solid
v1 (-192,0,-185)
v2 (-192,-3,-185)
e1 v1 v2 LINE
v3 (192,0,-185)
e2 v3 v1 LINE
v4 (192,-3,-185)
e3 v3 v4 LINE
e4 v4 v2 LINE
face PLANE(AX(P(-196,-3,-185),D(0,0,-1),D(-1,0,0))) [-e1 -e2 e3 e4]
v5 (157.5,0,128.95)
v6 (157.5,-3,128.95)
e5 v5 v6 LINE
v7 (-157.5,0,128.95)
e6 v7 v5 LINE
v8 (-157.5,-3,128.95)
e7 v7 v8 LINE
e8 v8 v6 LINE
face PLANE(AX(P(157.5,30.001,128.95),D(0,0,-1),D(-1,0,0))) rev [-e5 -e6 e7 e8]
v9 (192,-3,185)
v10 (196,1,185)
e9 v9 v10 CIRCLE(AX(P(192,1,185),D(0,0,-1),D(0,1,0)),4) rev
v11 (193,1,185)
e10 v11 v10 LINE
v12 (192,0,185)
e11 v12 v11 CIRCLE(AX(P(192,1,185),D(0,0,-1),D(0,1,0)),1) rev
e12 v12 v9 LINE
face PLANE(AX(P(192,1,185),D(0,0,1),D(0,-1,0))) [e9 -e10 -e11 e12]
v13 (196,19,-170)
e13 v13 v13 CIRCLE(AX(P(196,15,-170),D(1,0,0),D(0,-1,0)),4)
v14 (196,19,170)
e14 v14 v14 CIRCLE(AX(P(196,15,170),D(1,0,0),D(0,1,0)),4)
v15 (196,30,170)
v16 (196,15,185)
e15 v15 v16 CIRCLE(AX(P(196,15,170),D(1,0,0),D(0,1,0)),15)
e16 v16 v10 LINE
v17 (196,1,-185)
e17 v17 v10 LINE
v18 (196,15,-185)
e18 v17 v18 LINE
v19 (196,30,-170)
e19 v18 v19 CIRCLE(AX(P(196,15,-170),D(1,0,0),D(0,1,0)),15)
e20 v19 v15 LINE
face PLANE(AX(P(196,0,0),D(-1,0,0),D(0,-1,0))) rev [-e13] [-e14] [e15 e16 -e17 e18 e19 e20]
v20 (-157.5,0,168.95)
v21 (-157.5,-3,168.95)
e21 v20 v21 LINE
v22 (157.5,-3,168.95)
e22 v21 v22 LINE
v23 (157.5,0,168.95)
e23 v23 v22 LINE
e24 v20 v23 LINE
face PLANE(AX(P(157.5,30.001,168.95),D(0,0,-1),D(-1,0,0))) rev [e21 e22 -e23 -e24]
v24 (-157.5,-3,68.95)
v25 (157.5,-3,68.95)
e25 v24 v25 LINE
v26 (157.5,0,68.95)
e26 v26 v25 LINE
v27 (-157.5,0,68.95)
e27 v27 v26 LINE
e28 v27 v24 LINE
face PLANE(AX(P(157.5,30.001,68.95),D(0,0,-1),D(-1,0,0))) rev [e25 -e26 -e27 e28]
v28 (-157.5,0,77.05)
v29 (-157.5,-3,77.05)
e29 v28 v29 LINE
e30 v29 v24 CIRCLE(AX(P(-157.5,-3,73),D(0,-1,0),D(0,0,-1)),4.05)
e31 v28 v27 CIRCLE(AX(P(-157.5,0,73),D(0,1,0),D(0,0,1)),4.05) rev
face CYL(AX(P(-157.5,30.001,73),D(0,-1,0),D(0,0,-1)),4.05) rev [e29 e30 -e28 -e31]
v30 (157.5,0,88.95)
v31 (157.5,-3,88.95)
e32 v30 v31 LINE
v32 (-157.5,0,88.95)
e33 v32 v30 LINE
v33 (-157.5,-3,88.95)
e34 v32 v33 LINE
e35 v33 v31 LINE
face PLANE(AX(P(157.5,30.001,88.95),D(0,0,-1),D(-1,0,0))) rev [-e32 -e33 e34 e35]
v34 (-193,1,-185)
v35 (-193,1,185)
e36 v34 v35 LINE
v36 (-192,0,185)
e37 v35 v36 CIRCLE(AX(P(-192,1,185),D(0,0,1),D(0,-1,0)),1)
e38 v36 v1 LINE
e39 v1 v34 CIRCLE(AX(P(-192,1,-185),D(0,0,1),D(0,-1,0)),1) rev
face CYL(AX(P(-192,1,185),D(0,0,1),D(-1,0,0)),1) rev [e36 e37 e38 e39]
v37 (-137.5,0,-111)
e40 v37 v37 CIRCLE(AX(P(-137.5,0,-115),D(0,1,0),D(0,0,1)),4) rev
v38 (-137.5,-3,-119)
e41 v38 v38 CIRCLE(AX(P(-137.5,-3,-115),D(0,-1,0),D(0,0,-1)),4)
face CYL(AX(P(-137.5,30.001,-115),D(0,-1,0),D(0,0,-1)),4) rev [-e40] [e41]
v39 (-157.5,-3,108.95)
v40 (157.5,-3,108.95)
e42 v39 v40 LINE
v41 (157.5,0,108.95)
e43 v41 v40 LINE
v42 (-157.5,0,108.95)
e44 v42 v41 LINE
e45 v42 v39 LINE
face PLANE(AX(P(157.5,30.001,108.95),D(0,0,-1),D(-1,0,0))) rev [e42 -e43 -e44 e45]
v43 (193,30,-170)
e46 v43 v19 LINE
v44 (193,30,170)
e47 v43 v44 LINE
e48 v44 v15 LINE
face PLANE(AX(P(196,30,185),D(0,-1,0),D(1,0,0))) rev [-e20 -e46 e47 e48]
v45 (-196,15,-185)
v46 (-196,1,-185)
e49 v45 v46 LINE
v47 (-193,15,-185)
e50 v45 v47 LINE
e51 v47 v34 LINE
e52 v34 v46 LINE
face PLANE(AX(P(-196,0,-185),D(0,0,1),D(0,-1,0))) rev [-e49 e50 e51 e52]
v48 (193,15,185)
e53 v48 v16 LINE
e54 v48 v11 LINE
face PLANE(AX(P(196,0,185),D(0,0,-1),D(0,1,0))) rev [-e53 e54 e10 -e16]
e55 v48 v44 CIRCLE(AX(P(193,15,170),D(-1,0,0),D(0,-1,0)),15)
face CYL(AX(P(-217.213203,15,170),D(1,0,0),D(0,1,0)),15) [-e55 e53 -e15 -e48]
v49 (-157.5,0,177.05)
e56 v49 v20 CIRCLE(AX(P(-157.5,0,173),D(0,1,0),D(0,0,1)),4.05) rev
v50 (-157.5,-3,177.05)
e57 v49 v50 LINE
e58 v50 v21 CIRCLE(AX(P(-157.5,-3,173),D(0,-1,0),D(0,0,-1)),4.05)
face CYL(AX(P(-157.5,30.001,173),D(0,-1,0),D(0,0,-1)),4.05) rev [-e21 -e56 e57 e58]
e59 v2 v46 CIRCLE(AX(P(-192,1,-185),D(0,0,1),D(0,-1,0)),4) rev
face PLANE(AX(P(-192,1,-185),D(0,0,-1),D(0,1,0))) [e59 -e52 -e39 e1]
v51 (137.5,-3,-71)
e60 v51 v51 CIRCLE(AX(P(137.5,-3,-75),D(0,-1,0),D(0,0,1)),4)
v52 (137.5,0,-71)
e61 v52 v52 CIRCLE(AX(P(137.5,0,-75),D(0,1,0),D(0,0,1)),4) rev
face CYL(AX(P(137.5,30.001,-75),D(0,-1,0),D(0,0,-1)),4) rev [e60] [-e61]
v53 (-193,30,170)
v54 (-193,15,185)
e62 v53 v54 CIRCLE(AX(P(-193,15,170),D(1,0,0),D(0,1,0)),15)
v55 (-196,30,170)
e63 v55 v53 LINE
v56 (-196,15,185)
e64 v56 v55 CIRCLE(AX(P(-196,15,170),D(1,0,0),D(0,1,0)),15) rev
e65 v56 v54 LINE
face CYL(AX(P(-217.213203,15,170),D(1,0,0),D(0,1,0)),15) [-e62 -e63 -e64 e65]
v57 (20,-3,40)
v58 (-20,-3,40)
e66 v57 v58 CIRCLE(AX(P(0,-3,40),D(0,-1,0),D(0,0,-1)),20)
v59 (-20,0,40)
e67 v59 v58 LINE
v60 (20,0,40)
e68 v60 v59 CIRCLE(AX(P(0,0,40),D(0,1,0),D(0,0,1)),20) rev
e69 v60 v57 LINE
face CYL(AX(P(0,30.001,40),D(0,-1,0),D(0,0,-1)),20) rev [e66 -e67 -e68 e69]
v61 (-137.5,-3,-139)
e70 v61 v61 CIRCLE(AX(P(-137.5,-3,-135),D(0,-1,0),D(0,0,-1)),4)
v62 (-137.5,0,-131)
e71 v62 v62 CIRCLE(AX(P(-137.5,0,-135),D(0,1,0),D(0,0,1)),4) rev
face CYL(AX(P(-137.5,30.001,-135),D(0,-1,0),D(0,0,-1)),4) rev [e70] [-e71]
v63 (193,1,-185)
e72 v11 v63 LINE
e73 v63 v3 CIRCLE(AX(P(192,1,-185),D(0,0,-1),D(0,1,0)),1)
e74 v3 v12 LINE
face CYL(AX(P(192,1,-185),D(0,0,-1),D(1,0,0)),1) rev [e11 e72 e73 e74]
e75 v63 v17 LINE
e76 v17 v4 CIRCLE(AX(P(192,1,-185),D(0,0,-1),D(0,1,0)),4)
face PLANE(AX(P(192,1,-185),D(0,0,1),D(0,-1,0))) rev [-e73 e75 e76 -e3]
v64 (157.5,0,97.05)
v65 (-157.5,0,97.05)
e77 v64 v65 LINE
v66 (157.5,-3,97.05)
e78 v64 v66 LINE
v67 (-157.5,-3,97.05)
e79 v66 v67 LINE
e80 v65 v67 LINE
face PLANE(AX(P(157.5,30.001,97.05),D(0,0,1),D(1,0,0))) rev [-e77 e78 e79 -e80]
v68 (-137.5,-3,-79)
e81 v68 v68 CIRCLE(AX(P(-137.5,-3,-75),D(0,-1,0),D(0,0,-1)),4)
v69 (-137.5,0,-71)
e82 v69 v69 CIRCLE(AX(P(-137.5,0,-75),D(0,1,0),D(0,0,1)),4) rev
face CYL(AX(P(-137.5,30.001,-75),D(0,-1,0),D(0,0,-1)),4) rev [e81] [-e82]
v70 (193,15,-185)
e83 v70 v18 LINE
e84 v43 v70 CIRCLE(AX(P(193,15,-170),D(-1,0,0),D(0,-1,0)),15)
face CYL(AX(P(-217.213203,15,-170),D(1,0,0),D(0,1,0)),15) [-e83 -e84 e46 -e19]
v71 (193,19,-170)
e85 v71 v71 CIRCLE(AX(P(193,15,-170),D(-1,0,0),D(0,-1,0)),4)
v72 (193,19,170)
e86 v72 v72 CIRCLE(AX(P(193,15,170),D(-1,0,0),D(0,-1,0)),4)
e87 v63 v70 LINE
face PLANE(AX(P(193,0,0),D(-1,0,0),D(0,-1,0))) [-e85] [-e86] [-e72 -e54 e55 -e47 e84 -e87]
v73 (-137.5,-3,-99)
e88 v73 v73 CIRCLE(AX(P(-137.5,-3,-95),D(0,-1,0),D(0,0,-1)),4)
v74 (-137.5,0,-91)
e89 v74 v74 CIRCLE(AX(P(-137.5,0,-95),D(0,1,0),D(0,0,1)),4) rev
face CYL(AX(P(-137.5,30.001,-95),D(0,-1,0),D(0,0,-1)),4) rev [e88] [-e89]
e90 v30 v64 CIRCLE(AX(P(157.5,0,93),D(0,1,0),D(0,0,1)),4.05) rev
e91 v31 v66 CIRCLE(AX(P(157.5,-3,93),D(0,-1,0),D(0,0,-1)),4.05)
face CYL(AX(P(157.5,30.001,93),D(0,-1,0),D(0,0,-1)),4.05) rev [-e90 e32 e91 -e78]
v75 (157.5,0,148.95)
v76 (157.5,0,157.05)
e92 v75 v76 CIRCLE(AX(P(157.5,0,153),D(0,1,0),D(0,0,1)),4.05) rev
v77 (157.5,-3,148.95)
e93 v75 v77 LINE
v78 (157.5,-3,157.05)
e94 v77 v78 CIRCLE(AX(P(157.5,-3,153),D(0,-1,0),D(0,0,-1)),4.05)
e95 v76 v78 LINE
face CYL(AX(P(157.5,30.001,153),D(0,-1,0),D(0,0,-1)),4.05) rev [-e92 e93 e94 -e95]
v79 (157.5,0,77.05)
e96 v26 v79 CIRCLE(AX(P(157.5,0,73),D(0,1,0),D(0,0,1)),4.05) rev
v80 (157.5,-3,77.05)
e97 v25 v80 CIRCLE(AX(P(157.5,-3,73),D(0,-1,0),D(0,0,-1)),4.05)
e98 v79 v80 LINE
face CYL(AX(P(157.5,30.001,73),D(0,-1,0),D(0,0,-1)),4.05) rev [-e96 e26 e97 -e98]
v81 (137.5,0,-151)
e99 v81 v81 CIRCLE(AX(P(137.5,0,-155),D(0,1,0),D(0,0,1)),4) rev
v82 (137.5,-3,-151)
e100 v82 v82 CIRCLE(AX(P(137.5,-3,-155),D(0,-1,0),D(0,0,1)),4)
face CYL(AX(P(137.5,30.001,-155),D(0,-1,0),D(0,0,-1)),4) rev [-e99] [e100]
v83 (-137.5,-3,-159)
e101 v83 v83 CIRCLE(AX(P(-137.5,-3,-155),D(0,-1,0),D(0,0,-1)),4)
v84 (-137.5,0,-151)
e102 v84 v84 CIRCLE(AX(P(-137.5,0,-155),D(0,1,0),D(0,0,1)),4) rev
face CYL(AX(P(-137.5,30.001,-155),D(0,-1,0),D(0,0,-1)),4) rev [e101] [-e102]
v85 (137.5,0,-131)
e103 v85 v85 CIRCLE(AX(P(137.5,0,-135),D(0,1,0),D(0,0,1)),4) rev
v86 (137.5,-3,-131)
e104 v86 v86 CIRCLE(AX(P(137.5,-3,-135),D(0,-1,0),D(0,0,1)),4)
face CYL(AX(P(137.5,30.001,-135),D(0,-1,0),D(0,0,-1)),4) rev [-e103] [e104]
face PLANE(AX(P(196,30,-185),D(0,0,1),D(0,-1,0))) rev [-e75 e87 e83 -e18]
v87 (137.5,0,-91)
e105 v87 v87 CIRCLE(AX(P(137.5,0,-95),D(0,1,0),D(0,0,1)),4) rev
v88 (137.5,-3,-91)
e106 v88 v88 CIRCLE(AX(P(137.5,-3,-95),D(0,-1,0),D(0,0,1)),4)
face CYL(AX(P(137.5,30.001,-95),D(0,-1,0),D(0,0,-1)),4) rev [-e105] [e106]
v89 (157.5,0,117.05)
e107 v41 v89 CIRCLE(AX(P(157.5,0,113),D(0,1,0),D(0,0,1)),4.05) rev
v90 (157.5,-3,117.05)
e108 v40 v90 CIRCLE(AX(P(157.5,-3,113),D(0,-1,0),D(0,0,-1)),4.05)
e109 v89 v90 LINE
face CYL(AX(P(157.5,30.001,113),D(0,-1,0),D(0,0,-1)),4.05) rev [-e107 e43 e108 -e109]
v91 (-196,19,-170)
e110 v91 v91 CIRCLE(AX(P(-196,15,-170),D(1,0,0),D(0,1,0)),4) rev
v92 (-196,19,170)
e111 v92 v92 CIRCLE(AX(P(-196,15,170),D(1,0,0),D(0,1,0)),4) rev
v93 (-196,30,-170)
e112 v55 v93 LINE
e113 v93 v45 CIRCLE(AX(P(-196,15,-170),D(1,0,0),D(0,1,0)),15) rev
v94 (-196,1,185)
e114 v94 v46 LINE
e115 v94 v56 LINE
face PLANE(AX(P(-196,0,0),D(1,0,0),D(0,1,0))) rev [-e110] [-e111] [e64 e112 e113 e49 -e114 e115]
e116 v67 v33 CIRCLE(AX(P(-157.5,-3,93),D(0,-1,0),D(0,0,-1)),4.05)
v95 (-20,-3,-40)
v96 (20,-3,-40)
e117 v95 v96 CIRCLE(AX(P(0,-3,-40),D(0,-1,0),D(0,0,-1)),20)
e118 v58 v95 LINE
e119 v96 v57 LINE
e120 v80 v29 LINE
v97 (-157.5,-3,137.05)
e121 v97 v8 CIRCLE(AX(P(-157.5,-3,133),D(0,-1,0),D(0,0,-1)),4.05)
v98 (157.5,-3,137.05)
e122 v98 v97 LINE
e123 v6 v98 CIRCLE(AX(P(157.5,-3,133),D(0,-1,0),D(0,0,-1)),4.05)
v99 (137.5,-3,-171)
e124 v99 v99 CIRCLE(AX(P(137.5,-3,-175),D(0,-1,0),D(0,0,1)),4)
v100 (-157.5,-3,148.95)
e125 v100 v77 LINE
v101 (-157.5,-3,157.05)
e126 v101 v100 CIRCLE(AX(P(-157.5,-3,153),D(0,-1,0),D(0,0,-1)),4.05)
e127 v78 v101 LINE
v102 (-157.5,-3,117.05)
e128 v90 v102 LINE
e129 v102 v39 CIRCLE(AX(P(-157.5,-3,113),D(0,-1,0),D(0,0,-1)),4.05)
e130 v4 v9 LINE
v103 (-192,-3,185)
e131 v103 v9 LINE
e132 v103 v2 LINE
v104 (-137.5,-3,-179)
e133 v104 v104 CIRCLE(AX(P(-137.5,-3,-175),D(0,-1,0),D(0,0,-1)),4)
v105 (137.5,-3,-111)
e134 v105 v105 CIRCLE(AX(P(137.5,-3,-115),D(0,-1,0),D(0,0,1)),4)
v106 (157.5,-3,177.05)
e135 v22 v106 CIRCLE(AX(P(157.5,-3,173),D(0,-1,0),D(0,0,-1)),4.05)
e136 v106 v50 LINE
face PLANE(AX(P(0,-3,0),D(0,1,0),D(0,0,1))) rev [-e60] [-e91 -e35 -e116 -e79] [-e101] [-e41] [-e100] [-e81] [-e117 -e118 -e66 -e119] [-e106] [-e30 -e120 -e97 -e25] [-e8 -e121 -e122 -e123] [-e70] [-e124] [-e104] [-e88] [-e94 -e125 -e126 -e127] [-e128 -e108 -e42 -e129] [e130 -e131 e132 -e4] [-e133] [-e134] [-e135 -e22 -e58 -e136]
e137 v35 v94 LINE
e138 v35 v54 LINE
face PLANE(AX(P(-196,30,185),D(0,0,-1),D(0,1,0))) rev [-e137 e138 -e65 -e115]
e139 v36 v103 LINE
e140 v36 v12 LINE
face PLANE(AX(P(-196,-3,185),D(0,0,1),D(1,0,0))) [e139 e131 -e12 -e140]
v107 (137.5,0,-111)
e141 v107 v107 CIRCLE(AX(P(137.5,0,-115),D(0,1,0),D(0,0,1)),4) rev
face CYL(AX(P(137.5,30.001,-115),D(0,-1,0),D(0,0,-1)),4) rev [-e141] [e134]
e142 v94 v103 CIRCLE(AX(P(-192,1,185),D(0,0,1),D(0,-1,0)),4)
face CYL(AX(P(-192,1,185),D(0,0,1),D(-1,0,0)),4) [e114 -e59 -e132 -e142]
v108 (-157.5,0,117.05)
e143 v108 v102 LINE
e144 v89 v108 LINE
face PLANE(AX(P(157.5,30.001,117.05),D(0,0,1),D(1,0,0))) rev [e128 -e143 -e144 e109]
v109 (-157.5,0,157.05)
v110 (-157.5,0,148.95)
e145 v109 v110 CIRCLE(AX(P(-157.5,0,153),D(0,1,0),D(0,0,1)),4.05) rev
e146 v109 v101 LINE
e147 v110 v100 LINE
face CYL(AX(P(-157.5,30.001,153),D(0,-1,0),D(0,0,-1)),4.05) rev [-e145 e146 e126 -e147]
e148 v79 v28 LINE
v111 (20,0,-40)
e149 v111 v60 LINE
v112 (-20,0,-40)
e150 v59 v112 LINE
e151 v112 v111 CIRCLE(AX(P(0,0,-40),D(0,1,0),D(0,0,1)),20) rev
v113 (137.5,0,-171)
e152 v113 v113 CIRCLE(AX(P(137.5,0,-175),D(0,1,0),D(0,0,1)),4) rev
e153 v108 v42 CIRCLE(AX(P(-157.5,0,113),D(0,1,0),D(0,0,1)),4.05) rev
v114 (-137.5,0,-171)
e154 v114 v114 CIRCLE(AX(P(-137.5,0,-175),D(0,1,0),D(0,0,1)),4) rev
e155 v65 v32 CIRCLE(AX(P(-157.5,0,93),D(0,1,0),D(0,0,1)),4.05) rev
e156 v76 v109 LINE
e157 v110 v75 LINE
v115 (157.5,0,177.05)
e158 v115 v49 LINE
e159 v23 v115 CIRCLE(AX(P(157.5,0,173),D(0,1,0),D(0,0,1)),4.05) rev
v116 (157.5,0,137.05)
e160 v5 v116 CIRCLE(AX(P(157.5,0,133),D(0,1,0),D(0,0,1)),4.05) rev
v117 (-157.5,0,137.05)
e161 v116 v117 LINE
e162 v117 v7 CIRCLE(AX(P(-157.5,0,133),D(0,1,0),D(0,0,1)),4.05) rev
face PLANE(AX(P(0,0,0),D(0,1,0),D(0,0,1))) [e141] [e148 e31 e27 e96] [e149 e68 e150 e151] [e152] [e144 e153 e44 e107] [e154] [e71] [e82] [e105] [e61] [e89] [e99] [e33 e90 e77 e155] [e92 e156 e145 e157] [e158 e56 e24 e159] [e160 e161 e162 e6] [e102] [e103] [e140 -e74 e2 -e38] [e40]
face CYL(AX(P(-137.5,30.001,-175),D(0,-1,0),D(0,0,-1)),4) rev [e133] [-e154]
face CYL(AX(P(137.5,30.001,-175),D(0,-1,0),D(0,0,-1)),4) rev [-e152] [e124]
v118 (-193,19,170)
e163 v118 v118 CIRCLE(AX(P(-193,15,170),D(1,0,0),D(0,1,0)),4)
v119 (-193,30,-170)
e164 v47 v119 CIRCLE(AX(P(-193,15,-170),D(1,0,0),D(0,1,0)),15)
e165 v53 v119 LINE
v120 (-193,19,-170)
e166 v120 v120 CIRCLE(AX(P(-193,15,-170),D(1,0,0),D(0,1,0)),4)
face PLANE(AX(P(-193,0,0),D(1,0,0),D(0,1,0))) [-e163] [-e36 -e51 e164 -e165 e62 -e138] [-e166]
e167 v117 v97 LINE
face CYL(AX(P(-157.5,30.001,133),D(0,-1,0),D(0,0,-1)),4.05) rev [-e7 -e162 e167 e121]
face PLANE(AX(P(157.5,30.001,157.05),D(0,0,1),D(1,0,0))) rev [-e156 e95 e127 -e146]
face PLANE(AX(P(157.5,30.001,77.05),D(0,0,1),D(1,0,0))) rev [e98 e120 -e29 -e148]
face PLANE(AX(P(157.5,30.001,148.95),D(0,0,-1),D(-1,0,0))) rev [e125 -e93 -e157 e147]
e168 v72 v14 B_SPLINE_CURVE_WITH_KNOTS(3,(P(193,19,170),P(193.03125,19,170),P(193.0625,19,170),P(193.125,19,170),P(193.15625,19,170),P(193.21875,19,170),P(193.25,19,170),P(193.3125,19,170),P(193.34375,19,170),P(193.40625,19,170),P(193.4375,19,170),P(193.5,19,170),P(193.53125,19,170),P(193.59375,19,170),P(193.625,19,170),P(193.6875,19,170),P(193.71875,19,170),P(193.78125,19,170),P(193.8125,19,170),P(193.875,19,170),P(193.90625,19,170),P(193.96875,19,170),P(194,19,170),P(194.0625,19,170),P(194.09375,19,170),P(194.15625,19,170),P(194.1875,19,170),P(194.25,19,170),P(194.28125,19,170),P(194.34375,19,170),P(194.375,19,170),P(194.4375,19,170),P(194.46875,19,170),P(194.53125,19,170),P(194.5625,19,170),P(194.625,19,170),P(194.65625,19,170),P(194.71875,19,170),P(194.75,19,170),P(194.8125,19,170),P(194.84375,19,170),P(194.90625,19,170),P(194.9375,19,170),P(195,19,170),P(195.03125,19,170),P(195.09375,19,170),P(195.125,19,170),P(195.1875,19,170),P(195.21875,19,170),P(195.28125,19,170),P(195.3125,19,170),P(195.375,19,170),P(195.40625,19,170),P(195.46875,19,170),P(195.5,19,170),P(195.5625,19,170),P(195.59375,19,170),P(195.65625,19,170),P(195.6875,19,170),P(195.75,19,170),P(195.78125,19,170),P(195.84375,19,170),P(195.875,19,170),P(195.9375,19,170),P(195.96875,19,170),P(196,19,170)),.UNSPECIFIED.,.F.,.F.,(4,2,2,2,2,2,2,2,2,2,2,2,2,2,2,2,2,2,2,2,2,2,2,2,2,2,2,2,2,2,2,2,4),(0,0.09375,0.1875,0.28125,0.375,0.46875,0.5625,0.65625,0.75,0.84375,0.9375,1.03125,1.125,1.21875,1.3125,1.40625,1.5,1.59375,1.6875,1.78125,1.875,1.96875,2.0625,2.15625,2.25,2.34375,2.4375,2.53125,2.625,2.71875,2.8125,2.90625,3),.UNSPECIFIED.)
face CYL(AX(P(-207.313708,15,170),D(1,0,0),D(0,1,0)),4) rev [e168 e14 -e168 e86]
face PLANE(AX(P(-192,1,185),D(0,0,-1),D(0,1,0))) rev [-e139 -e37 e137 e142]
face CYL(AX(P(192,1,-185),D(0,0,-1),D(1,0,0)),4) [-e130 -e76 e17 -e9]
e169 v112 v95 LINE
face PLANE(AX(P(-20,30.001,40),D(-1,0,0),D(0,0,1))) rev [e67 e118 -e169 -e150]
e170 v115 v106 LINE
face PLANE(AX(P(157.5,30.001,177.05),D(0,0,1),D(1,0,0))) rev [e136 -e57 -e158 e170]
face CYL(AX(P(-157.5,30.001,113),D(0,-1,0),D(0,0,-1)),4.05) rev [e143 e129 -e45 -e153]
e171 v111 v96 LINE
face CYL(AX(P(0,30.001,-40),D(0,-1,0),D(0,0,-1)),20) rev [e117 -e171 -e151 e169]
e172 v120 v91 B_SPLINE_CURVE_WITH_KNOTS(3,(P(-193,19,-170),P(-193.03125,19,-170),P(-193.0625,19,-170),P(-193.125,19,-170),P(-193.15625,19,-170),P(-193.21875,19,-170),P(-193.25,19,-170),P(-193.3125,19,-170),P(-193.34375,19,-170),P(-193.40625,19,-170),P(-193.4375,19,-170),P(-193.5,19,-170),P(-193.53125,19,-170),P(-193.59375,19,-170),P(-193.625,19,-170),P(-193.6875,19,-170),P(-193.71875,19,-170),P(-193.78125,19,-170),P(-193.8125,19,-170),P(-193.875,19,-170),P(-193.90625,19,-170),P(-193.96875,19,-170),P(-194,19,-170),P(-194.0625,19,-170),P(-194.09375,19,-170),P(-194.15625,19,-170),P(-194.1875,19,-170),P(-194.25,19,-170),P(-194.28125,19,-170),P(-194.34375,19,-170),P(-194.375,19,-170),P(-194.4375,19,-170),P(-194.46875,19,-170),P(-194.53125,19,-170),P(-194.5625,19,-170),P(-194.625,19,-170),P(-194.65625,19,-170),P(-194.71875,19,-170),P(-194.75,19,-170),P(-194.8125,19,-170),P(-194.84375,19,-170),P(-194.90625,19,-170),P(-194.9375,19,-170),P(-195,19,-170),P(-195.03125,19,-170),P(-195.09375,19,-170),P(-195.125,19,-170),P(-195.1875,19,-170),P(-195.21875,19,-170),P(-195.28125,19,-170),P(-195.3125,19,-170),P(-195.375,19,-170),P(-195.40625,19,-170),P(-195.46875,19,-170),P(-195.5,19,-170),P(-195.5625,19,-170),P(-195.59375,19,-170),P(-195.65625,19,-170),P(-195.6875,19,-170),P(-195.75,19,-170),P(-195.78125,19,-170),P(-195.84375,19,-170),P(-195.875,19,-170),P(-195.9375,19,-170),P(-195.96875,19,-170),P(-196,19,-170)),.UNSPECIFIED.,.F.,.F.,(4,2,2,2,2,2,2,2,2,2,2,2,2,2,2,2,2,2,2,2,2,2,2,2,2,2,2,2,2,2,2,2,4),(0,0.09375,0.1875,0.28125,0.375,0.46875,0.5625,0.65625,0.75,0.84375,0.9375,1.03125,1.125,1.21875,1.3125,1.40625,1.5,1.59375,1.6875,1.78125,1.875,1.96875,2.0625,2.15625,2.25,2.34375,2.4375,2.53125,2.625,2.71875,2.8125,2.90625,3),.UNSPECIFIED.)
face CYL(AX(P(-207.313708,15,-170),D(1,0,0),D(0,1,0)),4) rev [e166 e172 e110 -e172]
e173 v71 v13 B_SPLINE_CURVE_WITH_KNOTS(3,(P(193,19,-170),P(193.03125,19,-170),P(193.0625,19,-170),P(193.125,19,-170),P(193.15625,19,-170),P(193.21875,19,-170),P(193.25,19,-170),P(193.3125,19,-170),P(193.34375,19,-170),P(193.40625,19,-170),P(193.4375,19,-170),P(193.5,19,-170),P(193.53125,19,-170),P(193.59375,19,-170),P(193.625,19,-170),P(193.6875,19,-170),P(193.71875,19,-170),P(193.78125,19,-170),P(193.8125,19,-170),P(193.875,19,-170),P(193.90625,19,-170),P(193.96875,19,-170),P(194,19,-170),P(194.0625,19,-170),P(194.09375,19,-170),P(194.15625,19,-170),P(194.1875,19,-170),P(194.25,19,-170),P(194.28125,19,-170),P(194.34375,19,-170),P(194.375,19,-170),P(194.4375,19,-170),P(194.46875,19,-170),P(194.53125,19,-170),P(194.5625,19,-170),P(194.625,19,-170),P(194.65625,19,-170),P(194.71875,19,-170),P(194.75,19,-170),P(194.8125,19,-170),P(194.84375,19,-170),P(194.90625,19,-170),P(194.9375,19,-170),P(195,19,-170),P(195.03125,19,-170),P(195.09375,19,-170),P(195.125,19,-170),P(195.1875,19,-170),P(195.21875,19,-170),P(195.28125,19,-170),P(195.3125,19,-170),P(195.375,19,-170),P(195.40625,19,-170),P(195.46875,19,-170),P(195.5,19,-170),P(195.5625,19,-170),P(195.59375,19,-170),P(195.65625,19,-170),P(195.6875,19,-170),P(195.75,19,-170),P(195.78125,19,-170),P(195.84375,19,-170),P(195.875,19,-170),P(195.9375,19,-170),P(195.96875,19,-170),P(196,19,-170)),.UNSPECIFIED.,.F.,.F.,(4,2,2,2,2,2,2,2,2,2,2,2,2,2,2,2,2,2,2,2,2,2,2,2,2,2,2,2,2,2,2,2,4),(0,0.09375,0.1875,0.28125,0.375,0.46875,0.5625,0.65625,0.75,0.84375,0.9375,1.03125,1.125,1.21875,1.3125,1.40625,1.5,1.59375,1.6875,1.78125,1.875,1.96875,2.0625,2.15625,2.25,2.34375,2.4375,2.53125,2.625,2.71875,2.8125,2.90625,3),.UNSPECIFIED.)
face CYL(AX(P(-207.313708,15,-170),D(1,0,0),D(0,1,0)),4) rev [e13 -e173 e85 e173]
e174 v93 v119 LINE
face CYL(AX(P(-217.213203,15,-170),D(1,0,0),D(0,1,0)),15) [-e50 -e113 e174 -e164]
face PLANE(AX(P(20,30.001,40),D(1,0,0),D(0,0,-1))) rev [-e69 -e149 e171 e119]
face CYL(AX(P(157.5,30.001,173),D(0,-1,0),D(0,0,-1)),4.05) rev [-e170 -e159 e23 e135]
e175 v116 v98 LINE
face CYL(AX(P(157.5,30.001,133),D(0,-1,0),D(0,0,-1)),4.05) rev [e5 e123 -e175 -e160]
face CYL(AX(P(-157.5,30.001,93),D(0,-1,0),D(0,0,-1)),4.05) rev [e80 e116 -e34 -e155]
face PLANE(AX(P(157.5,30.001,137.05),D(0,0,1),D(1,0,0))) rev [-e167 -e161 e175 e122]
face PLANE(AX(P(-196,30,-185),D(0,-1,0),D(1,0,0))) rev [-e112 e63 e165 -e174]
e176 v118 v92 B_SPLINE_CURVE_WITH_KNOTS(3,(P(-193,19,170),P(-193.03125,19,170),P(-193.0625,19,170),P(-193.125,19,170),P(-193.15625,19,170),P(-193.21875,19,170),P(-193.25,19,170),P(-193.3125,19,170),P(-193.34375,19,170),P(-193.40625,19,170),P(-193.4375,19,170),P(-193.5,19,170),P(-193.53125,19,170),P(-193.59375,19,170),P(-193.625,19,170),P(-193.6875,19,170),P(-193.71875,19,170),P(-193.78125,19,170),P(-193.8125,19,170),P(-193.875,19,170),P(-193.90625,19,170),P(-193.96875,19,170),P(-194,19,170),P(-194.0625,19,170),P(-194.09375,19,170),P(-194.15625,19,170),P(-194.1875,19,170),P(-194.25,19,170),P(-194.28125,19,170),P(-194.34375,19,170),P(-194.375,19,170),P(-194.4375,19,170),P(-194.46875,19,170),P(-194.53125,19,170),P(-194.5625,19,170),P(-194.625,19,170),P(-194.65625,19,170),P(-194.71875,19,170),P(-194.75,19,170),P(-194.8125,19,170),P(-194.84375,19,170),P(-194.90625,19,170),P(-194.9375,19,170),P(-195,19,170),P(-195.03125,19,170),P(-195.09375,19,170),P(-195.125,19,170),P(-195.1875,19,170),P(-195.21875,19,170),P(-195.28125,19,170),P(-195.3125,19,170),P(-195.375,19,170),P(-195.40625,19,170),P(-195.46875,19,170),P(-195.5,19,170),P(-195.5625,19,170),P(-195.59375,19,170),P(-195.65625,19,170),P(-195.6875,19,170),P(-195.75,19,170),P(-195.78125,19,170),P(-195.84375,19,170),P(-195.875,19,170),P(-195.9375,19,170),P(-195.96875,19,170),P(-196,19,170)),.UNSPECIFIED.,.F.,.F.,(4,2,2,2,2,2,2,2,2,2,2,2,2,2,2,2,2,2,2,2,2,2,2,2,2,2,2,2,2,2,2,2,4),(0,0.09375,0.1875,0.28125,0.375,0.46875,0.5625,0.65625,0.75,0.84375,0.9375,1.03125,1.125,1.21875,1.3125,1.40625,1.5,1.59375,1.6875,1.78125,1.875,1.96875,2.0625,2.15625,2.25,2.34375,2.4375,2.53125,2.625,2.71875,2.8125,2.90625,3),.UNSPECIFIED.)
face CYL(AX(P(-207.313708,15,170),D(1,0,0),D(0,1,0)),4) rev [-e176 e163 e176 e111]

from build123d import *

# Parameters (mm, degrees)
SKETCH1_W                      = 392
SKETCH1_H                      = 370
BASE_FLANGE1_DEPTH             = 3
EDGE_FLANGE1_STRIP_W           = 14
EDGE_FLANGE1_STRIP_H           = 3
EDGE_FLANGE1_STRIP_CUT_DEPTH   = 370
EDGE_FLANGE1_STRIP_2_W         = 14
EDGE_FLANGE1_STRIP_2_H         = 3
EDGE_FLANGE1_STRIP_CUT_2_DEPTH = 370
EDGE_FLANGE1_DEPTH             = 370
EDGE_FLANGE1_BEND_DEPTH        = 370
CUT_EXTRUDE1_REACH             = 436.499
SKETCH11_R                     = 4
CUT_EXTRUDE2_REACH             = 273.533
SKETCH12_R                     = 4
CUT_EXTRUDE3_REACH             = 436.499


# Sheet-metal steps are written as plain solids
with BuildPart() as part:
    # Sketch1 → Base-Flange1 (new body)
    with BuildSketch(Plane(origin=(0, 0, 0), x_dir=(1, 0, 0), z_dir=(0, 1, 0))):
        Rectangle(SKETCH1_W, SKETCH1_H)
    extrude(amount=-BASE_FLANGE1_DEPTH)

    # Edge-Flange1 strip (across the edge) → Edge-Flange1 strip cut (cut)
    with BuildSketch(Plane(origin=(-196, 0, -185), x_dir=(1, 0, 0), z_dir=(0, 0, 1))):
        with Locations((-3, -1.5)):
            Rectangle(EDGE_FLANGE1_STRIP_W, EDGE_FLANGE1_STRIP_H)
    extrude(amount=EDGE_FLANGE1_STRIP_CUT_DEPTH, mode=Mode.SUBTRACT)

    # Edge-Flange1 strip 2 (across the edge) → Edge-Flange1 strip cut 2 (cut)
    with BuildSketch(Plane(origin=(196, 0, 185), x_dir=(-1, 0, 0), z_dir=(0, 0, -1))):
        with Locations((-3, -1.5)):
            Rectangle(EDGE_FLANGE1_STRIP_2_W, EDGE_FLANGE1_STRIP_2_H)
    extrude(amount=EDGE_FLANGE1_STRIP_CUT_2_DEPTH, mode=Mode.SUBTRACT)

    # Edge-Flange1 section (across the edge) → Edge-Flange1 (add)
    with BuildSketch(Plane(origin=(-196, 0, -185), x_dir=(1, 0, 0), z_dir=(0, 0, 1))):
        with BuildLine():
            Line((0, 1), (0, 30))
            Line((0, 30), (3, 30))
            Line((3, 30), (3, 1))
            ThreePointArc((3, 1), (3.292893219, 0.292893219), (4, 0))
            Line((4, 0), (4, -3))
            ThreePointArc((4, -3), (1.171572875, -1.828427125), (0, 1))
        make_face()
    extrude(amount=EDGE_FLANGE1_DEPTH)

    # Edge-Flange1 section 2 (across the edge) → Edge-Flange1 bend (add)
    with BuildSketch(Plane(origin=(196, 0, 185), x_dir=(-1, 0, 0), z_dir=(0, 0, -1))):
        with BuildLine():
            Line((0, 1), (0, 30))
            Line((0, 30), (3, 30))
            Line((3, 30), (3, 1))
            ThreePointArc((3, 1), (3.292893219, 0.292893219), (4, 0))
            Line((4, 0), (4, -3))
            ThreePointArc((4, -3), (1.171572875, -1.828427125), (0, 1))
        make_face()
    extrude(amount=EDGE_FLANGE1_BEND_DEPTH)

    # Cut-Extrude1: up to this face of the body (flat: up to its plane)
    cut_extrude1_end = Plane(part.part.faces().sort_by_distance((-196, 15.5, 0))[0])
    # Sketch11 → Cut-Extrude1 (cut, up to the picked face)
    with BuildSketch(Plane(origin=(196, 0, 0), x_dir=(0, 0, -1), z_dir=(1, 0, 0)), mode=Mode.PRIVATE) as cut_extrude1_sk1:
        with Locations(Location((-170, 15, 0), (0, 0, 90))):
            Circle(SKETCH11_R)
    cut_extrude1_tool1 = split(extrude(cut_extrude1_sk1.sketch, amount=-CUT_EXTRUDE1_REACH, mode=Mode.PRIVATE), bisect_by=cut_extrude1_end, keep=Keep.BOTH, mode=Mode.PRIVATE)
    # Sketch11 → Cut-Extrude1 (cut, up to the picked face)
    with BuildSketch(Plane(origin=(196, 0, 0), x_dir=(0, 0, -1), z_dir=(1, 0, 0)), mode=Mode.PRIVATE) as cut_extrude1_sk2:
        with Locations(Location((170, 15, 0), (0, 0, 90))):
            Circle(SKETCH11_R)
    cut_extrude1_tool2 = split(extrude(cut_extrude1_sk2.sketch, amount=-CUT_EXTRUDE1_REACH, mode=Mode.PRIVATE), bisect_by=cut_extrude1_end, keep=Keep.BOTH, mode=Mode.PRIVATE)
    add(cut_extrude1_tool1.solids().sort_by(Axis((196, 15, 170), (-1, 0, 0)))[0], mode=Mode.SUBTRACT)
    add(cut_extrude1_tool2.solids().sort_by(Axis((196, 15, -170), (-1, 0, 0)))[0], mode=Mode.SUBTRACT)

    # Sketch12 → Cut-Extrude2 (cut, up to next)
    with BuildSketch(Plane.XZ.offset(3), mode=Mode.PRIVATE) as cut_extrude2_sk1:
        with Locations(Location((-137.5, -135, 0), (0, 0, 270))):
            Circle(SKETCH12_R)
    cut_extrude2_tool1 = extrude(cut_extrude2_sk1.sketch, amount=-CUT_EXTRUDE2_REACH, mode=Mode.PRIVATE) & part.part
    # Sketch12 → Cut-Extrude2 (cut, up to next)
    with BuildSketch(Plane.XZ.offset(3), mode=Mode.PRIVATE) as cut_extrude2_sk2:
        with Locations(Location((137.5, -135, 0), (0, 0, 90))):
            Circle(SKETCH12_R)
    cut_extrude2_tool2 = extrude(cut_extrude2_sk2.sketch, amount=-CUT_EXTRUDE2_REACH, mode=Mode.PRIVATE) & part.part
    # Sketch12 → Cut-Extrude2 (cut, up to next)
    with BuildSketch(Plane.XZ.offset(3), mode=Mode.PRIVATE) as cut_extrude2_sk3:
        with Locations(Location((-137.5, -115, 0), (0, 0, 270))):
            Circle(SKETCH12_R)
    cut_extrude2_tool3 = extrude(cut_extrude2_sk3.sketch, amount=-CUT_EXTRUDE2_REACH, mode=Mode.PRIVATE) & part.part
    # Sketch12 → Cut-Extrude2 (cut, up to next)
    with BuildSketch(Plane.XZ.offset(3), mode=Mode.PRIVATE) as cut_extrude2_sk4:
        with Locations(Location((137.5, -115, 0), (0, 0, 90))):
            Circle(SKETCH12_R)
    cut_extrude2_tool4 = extrude(cut_extrude2_sk4.sketch, amount=-CUT_EXTRUDE2_REACH, mode=Mode.PRIVATE) & part.part
    # Sketch12 → Cut-Extrude2 (cut, up to next)
    with BuildSketch(Plane.XZ.offset(3), mode=Mode.PRIVATE) as cut_extrude2_sk5:
        with Locations(Location((-137.5, -95, 0), (0, 0, 270))):
            Circle(SKETCH12_R)
    cut_extrude2_tool5 = extrude(cut_extrude2_sk5.sketch, amount=-CUT_EXTRUDE2_REACH, mode=Mode.PRIVATE) & part.part
    # Sketch12 → Cut-Extrude2 (cut, up to next)
    with BuildSketch(Plane.XZ.offset(3), mode=Mode.PRIVATE) as cut_extrude2_sk6:
        with Locations(Location((137.5, -95, 0), (0, 0, 90))):
            Circle(SKETCH12_R)
    cut_extrude2_tool6 = extrude(cut_extrude2_sk6.sketch, amount=-CUT_EXTRUDE2_REACH, mode=Mode.PRIVATE) & part.part
    # Sketch12 → Cut-Extrude2 (cut, up to next)
    with BuildSketch(Plane.XZ.offset(3), mode=Mode.PRIVATE) as cut_extrude2_sk7:
        with Locations(Location((-137.5, -75, 0), (0, 0, 270))):
            Circle(SKETCH12_R)
    cut_extrude2_tool7 = extrude(cut_extrude2_sk7.sketch, amount=-CUT_EXTRUDE2_REACH, mode=Mode.PRIVATE) & part.part
    # Sketch12 → Cut-Extrude2 (cut, up to next)
    with BuildSketch(Plane.XZ.offset(3), mode=Mode.PRIVATE) as cut_extrude2_sk8:
        with Locations(Location((137.5, -75, 0), (0, 0, 90))):
            Circle(SKETCH12_R)
    cut_extrude2_tool8 = extrude(cut_extrude2_sk8.sketch, amount=-CUT_EXTRUDE2_REACH, mode=Mode.PRIVATE) & part.part
    # Sketch12 → Cut-Extrude2 (cut, up to next)
    with BuildSketch(Plane.XZ.offset(3), mode=Mode.PRIVATE) as cut_extrude2_sk9:
        with Locations(Location((-137.5, -155, 0), (0, 0, 270))):
            Circle(SKETCH12_R)
    cut_extrude2_tool9 = extrude(cut_extrude2_sk9.sketch, amount=-CUT_EXTRUDE2_REACH, mode=Mode.PRIVATE) & part.part
    # Sketch12 → Cut-Extrude2 (cut, up to next)
    with BuildSketch(Plane.XZ.offset(3), mode=Mode.PRIVATE) as cut_extrude2_sk10:
        with Locations(Location((137.5, -155, 0), (0, 0, 90))):
            Circle(SKETCH12_R)
    cut_extrude2_tool10 = extrude(cut_extrude2_sk10.sketch, amount=-CUT_EXTRUDE2_REACH, mode=Mode.PRIVATE) & part.part
    # Sketch12 → Cut-Extrude2 (cut, up to next)
    with BuildSketch(Plane.XZ.offset(3), mode=Mode.PRIVATE) as cut_extrude2_sk11:
        with Locations(Location((-137.5, -175, 0), (0, 0, 270))):
            Circle(SKETCH12_R)
    cut_extrude2_tool11 = extrude(cut_extrude2_sk11.sketch, amount=-CUT_EXTRUDE2_REACH, mode=Mode.PRIVATE) & part.part
    # Sketch12 → Cut-Extrude2 (cut, up to next)
    with BuildSketch(Plane.XZ.offset(3), mode=Mode.PRIVATE) as cut_extrude2_sk12:
        with Locations(Location((137.5, -175, 0), (0, 0, 90))):
            Circle(SKETCH12_R)
    cut_extrude2_tool12 = extrude(cut_extrude2_sk12.sketch, amount=-CUT_EXTRUDE2_REACH, mode=Mode.PRIVATE) & part.part
    # Sketch12 → Cut-Extrude2 (cut, up to next)
    with BuildSketch(Plane.XZ.offset(3), mode=Mode.PRIVATE) as cut_extrude2_sk13:
        with BuildLine():
            Line((157.5, 108.95), (-157.5, 108.95))
            ThreePointArc((-157.5, 108.95), (-161.55, 113), (-157.5, 117.05))
            Line((-157.5, 117.05), (157.5, 117.05))
            ThreePointArc((157.5, 117.05), (161.55, 113), (157.5, 108.95))
        make_face()
    cut_extrude2_tool13 = extrude(cut_extrude2_sk13.sketch, amount=-CUT_EXTRUDE2_REACH, mode=Mode.PRIVATE) & part.part
    # Sketch12 → Cut-Extrude2 (cut, up to next)
    with BuildSketch(Plane.XZ.offset(3), mode=Mode.PRIVATE) as cut_extrude2_sk14:
        with BuildLine():
            Line((157.5, 128.95), (-157.5, 128.95))
            ThreePointArc((-157.5, 128.95), (-161.55, 133), (-157.5, 137.05))
            Line((-157.5, 137.05), (157.5, 137.05))
            ThreePointArc((157.5, 137.05), (161.55, 133), (157.5, 128.95))
        make_face()
    cut_extrude2_tool14 = extrude(cut_extrude2_sk14.sketch, amount=-CUT_EXTRUDE2_REACH, mode=Mode.PRIVATE) & part.part
    # Sketch12 → Cut-Extrude2 (cut, up to next)
    with BuildSketch(Plane.XZ.offset(3), mode=Mode.PRIVATE) as cut_extrude2_sk15:
        with BuildLine():
            Line((157.5, 148.95), (-157.5, 148.95))
            ThreePointArc((-157.5, 148.95), (-161.55, 153), (-157.5, 157.05))
            Line((-157.5, 157.05), (157.5, 157.05))
            ThreePointArc((157.5, 157.05), (161.55, 153), (157.5, 148.95))
        make_face()
    cut_extrude2_tool15 = extrude(cut_extrude2_sk15.sketch, amount=-CUT_EXTRUDE2_REACH, mode=Mode.PRIVATE) & part.part
    # Sketch12 → Cut-Extrude2 (cut, up to next)
    with BuildSketch(Plane.XZ.offset(3), mode=Mode.PRIVATE) as cut_extrude2_sk16:
        with BuildLine():
            Line((157.5, 168.95), (-157.5, 168.95))
            ThreePointArc((-157.5, 168.95), (-161.55, 173), (-157.5, 177.05))
            Line((-157.5, 177.05), (157.5, 177.05))
            ThreePointArc((157.5, 177.05), (161.55, 173), (157.5, 168.95))
        make_face()
    cut_extrude2_tool16 = extrude(cut_extrude2_sk16.sketch, amount=-CUT_EXTRUDE2_REACH, mode=Mode.PRIVATE) & part.part
    # Sketch12 → Cut-Extrude2 (cut, up to next)
    with BuildSketch(Plane.XZ.offset(3), mode=Mode.PRIVATE) as cut_extrude2_sk17:
        with BuildLine():
            Line((20, 40), (20, -40))
            ThreePointArc((20, -40), (0, -60), (-20, -40))
            Line((-20, -40), (-20, 40))
            ThreePointArc((-20, 40), (0, 60), (20, 40))
        make_face()
    cut_extrude2_tool17 = extrude(cut_extrude2_sk17.sketch, amount=-CUT_EXTRUDE2_REACH, mode=Mode.PRIVATE) & part.part
    # Sketch12 → Cut-Extrude2 (cut, up to next)
    with BuildSketch(Plane.XZ.offset(3), mode=Mode.PRIVATE) as cut_extrude2_sk18:
        with BuildLine():
            Line((157.5, 88.95), (-157.5, 88.95))
            ThreePointArc((-157.5, 88.95), (-161.55, 93), (-157.5, 97.05))
            Line((-157.5, 97.05), (157.5, 97.05))
            ThreePointArc((157.5, 97.05), (161.55, 93), (157.5, 88.95))
        make_face()
    cut_extrude2_tool18 = extrude(cut_extrude2_sk18.sketch, amount=-CUT_EXTRUDE2_REACH, mode=Mode.PRIVATE) & part.part
    # Sketch12 → Cut-Extrude2 (cut, up to next)
    with BuildSketch(Plane.XZ.offset(3), mode=Mode.PRIVATE) as cut_extrude2_sk19:
        with BuildLine():
            Line((157.5, 68.95), (-157.5, 68.95))
            ThreePointArc((-157.5, 68.95), (-161.55, 73), (-157.5, 77.05))
            Line((-157.5, 77.05), (157.5, 77.05))
            ThreePointArc((157.5, 77.05), (161.55, 73), (157.5, 68.95))
        make_face()
    cut_extrude2_tool19 = extrude(cut_extrude2_sk19.sketch, amount=-CUT_EXTRUDE2_REACH, mode=Mode.PRIVATE) & part.part
    add(cut_extrude2_tool1.solids().sort_by_distance((-137.5, -3, -135))[0], mode=Mode.SUBTRACT)
    add(cut_extrude2_tool2.solids().sort_by_distance((137.5, -3, -135))[0], mode=Mode.SUBTRACT)
    add(cut_extrude2_tool3.solids().sort_by_distance((-137.5, -3, -115))[0], mode=Mode.SUBTRACT)
    add(cut_extrude2_tool4.solids().sort_by_distance((137.5, -3, -115))[0], mode=Mode.SUBTRACT)
    add(cut_extrude2_tool5.solids().sort_by_distance((-137.5, -3, -95))[0], mode=Mode.SUBTRACT)
    add(cut_extrude2_tool6.solids().sort_by_distance((137.5, -3, -95))[0], mode=Mode.SUBTRACT)
    add(cut_extrude2_tool7.solids().sort_by_distance((-137.5, -3, -75))[0], mode=Mode.SUBTRACT)
    add(cut_extrude2_tool8.solids().sort_by_distance((137.5, -3, -75))[0], mode=Mode.SUBTRACT)
    add(cut_extrude2_tool9.solids().sort_by_distance((-137.5, -3, -155))[0], mode=Mode.SUBTRACT)
    add(cut_extrude2_tool10.solids().sort_by_distance((137.5, -3, -155))[0], mode=Mode.SUBTRACT)
    add(cut_extrude2_tool11.solids().sort_by_distance((-137.5, -3, -175))[0], mode=Mode.SUBTRACT)
    add(cut_extrude2_tool12.solids().sort_by_distance((137.5, -3, -175))[0], mode=Mode.SUBTRACT)
    add(cut_extrude2_tool13.solids().sort_by_distance((0, -3, 113))[0], mode=Mode.SUBTRACT)
    add(cut_extrude2_tool14.solids().sort_by_distance((0, -3, 133))[0], mode=Mode.SUBTRACT)
    add(cut_extrude2_tool15.solids().sort_by_distance((0, -3, 153))[0], mode=Mode.SUBTRACT)
    add(cut_extrude2_tool16.solids().sort_by_distance((0, -3, 173))[0], mode=Mode.SUBTRACT)
    add(cut_extrude2_tool17.solids().sort_by_distance((0, -3, 0))[0], mode=Mode.SUBTRACT)
    add(cut_extrude2_tool18.solids().sort_by_distance((0, -3, 93))[0], mode=Mode.SUBTRACT)
    add(cut_extrude2_tool19.solids().sort_by_distance((0, -3, 73))[0], mode=Mode.SUBTRACT)

    # Cut-Extrude3: up to this face of the body (flat: up to its plane)
    cut_extrude3_end = Plane(part.part.faces().sort_by_distance((-196, 15.50472888, 0))[0])
    # Sketch13 → Cut-Extrude3 (cut, up to the picked face)
    with BuildSketch(Plane(origin=(196, 0, 0), x_dir=(0, 0, -1), z_dir=(1, 0, 0)), mode=Mode.PRIVATE) as cut_extrude3_sk1:
        with BuildLine():
            Line((185, 30), (170, 30))
            ThreePointArc((170, 30), (180.606601718, 25.606601718), (185, 15))
            Line((185, 15), (185, 30))
        make_face()
    cut_extrude3_tool1 = split(extrude(cut_extrude3_sk1.sketch, amount=-CUT_EXTRUDE3_REACH, mode=Mode.PRIVATE), bisect_by=cut_extrude3_end, keep=Keep.BOTH, mode=Mode.PRIVATE)
    # Sketch13 → Cut-Extrude3 (cut, up to the picked face)
    with BuildSketch(Plane(origin=(196, 0, 0), x_dir=(0, 0, -1), z_dir=(1, 0, 0)), mode=Mode.PRIVATE) as cut_extrude3_sk2:
        with BuildLine():
            Line((-185, 30), (-185, 15))
            ThreePointArc((-185, 15), (-180.606601718, 25.606601718), (-170, 30))
            Line((-170, 30), (-185, 30))
        make_face()
    cut_extrude3_tool2 = split(extrude(cut_extrude3_sk2.sketch, amount=-CUT_EXTRUDE3_REACH, mode=Mode.PRIVATE), bisect_by=cut_extrude3_end, keep=Keep.BOTH, mode=Mode.PRIVATE)
    add(cut_extrude3_tool1.solids().sort_by(Axis((196, 26.649481, -181.649481), (-1, 0, 0)))[0], mode=Mode.SUBTRACT)
    add(cut_extrude3_tool2.solids().sort_by(Axis((196, 26.649481, 181.649481), (-1, 0, 0)))[0], mode=Mode.SUBTRACT)


solid = part.part
